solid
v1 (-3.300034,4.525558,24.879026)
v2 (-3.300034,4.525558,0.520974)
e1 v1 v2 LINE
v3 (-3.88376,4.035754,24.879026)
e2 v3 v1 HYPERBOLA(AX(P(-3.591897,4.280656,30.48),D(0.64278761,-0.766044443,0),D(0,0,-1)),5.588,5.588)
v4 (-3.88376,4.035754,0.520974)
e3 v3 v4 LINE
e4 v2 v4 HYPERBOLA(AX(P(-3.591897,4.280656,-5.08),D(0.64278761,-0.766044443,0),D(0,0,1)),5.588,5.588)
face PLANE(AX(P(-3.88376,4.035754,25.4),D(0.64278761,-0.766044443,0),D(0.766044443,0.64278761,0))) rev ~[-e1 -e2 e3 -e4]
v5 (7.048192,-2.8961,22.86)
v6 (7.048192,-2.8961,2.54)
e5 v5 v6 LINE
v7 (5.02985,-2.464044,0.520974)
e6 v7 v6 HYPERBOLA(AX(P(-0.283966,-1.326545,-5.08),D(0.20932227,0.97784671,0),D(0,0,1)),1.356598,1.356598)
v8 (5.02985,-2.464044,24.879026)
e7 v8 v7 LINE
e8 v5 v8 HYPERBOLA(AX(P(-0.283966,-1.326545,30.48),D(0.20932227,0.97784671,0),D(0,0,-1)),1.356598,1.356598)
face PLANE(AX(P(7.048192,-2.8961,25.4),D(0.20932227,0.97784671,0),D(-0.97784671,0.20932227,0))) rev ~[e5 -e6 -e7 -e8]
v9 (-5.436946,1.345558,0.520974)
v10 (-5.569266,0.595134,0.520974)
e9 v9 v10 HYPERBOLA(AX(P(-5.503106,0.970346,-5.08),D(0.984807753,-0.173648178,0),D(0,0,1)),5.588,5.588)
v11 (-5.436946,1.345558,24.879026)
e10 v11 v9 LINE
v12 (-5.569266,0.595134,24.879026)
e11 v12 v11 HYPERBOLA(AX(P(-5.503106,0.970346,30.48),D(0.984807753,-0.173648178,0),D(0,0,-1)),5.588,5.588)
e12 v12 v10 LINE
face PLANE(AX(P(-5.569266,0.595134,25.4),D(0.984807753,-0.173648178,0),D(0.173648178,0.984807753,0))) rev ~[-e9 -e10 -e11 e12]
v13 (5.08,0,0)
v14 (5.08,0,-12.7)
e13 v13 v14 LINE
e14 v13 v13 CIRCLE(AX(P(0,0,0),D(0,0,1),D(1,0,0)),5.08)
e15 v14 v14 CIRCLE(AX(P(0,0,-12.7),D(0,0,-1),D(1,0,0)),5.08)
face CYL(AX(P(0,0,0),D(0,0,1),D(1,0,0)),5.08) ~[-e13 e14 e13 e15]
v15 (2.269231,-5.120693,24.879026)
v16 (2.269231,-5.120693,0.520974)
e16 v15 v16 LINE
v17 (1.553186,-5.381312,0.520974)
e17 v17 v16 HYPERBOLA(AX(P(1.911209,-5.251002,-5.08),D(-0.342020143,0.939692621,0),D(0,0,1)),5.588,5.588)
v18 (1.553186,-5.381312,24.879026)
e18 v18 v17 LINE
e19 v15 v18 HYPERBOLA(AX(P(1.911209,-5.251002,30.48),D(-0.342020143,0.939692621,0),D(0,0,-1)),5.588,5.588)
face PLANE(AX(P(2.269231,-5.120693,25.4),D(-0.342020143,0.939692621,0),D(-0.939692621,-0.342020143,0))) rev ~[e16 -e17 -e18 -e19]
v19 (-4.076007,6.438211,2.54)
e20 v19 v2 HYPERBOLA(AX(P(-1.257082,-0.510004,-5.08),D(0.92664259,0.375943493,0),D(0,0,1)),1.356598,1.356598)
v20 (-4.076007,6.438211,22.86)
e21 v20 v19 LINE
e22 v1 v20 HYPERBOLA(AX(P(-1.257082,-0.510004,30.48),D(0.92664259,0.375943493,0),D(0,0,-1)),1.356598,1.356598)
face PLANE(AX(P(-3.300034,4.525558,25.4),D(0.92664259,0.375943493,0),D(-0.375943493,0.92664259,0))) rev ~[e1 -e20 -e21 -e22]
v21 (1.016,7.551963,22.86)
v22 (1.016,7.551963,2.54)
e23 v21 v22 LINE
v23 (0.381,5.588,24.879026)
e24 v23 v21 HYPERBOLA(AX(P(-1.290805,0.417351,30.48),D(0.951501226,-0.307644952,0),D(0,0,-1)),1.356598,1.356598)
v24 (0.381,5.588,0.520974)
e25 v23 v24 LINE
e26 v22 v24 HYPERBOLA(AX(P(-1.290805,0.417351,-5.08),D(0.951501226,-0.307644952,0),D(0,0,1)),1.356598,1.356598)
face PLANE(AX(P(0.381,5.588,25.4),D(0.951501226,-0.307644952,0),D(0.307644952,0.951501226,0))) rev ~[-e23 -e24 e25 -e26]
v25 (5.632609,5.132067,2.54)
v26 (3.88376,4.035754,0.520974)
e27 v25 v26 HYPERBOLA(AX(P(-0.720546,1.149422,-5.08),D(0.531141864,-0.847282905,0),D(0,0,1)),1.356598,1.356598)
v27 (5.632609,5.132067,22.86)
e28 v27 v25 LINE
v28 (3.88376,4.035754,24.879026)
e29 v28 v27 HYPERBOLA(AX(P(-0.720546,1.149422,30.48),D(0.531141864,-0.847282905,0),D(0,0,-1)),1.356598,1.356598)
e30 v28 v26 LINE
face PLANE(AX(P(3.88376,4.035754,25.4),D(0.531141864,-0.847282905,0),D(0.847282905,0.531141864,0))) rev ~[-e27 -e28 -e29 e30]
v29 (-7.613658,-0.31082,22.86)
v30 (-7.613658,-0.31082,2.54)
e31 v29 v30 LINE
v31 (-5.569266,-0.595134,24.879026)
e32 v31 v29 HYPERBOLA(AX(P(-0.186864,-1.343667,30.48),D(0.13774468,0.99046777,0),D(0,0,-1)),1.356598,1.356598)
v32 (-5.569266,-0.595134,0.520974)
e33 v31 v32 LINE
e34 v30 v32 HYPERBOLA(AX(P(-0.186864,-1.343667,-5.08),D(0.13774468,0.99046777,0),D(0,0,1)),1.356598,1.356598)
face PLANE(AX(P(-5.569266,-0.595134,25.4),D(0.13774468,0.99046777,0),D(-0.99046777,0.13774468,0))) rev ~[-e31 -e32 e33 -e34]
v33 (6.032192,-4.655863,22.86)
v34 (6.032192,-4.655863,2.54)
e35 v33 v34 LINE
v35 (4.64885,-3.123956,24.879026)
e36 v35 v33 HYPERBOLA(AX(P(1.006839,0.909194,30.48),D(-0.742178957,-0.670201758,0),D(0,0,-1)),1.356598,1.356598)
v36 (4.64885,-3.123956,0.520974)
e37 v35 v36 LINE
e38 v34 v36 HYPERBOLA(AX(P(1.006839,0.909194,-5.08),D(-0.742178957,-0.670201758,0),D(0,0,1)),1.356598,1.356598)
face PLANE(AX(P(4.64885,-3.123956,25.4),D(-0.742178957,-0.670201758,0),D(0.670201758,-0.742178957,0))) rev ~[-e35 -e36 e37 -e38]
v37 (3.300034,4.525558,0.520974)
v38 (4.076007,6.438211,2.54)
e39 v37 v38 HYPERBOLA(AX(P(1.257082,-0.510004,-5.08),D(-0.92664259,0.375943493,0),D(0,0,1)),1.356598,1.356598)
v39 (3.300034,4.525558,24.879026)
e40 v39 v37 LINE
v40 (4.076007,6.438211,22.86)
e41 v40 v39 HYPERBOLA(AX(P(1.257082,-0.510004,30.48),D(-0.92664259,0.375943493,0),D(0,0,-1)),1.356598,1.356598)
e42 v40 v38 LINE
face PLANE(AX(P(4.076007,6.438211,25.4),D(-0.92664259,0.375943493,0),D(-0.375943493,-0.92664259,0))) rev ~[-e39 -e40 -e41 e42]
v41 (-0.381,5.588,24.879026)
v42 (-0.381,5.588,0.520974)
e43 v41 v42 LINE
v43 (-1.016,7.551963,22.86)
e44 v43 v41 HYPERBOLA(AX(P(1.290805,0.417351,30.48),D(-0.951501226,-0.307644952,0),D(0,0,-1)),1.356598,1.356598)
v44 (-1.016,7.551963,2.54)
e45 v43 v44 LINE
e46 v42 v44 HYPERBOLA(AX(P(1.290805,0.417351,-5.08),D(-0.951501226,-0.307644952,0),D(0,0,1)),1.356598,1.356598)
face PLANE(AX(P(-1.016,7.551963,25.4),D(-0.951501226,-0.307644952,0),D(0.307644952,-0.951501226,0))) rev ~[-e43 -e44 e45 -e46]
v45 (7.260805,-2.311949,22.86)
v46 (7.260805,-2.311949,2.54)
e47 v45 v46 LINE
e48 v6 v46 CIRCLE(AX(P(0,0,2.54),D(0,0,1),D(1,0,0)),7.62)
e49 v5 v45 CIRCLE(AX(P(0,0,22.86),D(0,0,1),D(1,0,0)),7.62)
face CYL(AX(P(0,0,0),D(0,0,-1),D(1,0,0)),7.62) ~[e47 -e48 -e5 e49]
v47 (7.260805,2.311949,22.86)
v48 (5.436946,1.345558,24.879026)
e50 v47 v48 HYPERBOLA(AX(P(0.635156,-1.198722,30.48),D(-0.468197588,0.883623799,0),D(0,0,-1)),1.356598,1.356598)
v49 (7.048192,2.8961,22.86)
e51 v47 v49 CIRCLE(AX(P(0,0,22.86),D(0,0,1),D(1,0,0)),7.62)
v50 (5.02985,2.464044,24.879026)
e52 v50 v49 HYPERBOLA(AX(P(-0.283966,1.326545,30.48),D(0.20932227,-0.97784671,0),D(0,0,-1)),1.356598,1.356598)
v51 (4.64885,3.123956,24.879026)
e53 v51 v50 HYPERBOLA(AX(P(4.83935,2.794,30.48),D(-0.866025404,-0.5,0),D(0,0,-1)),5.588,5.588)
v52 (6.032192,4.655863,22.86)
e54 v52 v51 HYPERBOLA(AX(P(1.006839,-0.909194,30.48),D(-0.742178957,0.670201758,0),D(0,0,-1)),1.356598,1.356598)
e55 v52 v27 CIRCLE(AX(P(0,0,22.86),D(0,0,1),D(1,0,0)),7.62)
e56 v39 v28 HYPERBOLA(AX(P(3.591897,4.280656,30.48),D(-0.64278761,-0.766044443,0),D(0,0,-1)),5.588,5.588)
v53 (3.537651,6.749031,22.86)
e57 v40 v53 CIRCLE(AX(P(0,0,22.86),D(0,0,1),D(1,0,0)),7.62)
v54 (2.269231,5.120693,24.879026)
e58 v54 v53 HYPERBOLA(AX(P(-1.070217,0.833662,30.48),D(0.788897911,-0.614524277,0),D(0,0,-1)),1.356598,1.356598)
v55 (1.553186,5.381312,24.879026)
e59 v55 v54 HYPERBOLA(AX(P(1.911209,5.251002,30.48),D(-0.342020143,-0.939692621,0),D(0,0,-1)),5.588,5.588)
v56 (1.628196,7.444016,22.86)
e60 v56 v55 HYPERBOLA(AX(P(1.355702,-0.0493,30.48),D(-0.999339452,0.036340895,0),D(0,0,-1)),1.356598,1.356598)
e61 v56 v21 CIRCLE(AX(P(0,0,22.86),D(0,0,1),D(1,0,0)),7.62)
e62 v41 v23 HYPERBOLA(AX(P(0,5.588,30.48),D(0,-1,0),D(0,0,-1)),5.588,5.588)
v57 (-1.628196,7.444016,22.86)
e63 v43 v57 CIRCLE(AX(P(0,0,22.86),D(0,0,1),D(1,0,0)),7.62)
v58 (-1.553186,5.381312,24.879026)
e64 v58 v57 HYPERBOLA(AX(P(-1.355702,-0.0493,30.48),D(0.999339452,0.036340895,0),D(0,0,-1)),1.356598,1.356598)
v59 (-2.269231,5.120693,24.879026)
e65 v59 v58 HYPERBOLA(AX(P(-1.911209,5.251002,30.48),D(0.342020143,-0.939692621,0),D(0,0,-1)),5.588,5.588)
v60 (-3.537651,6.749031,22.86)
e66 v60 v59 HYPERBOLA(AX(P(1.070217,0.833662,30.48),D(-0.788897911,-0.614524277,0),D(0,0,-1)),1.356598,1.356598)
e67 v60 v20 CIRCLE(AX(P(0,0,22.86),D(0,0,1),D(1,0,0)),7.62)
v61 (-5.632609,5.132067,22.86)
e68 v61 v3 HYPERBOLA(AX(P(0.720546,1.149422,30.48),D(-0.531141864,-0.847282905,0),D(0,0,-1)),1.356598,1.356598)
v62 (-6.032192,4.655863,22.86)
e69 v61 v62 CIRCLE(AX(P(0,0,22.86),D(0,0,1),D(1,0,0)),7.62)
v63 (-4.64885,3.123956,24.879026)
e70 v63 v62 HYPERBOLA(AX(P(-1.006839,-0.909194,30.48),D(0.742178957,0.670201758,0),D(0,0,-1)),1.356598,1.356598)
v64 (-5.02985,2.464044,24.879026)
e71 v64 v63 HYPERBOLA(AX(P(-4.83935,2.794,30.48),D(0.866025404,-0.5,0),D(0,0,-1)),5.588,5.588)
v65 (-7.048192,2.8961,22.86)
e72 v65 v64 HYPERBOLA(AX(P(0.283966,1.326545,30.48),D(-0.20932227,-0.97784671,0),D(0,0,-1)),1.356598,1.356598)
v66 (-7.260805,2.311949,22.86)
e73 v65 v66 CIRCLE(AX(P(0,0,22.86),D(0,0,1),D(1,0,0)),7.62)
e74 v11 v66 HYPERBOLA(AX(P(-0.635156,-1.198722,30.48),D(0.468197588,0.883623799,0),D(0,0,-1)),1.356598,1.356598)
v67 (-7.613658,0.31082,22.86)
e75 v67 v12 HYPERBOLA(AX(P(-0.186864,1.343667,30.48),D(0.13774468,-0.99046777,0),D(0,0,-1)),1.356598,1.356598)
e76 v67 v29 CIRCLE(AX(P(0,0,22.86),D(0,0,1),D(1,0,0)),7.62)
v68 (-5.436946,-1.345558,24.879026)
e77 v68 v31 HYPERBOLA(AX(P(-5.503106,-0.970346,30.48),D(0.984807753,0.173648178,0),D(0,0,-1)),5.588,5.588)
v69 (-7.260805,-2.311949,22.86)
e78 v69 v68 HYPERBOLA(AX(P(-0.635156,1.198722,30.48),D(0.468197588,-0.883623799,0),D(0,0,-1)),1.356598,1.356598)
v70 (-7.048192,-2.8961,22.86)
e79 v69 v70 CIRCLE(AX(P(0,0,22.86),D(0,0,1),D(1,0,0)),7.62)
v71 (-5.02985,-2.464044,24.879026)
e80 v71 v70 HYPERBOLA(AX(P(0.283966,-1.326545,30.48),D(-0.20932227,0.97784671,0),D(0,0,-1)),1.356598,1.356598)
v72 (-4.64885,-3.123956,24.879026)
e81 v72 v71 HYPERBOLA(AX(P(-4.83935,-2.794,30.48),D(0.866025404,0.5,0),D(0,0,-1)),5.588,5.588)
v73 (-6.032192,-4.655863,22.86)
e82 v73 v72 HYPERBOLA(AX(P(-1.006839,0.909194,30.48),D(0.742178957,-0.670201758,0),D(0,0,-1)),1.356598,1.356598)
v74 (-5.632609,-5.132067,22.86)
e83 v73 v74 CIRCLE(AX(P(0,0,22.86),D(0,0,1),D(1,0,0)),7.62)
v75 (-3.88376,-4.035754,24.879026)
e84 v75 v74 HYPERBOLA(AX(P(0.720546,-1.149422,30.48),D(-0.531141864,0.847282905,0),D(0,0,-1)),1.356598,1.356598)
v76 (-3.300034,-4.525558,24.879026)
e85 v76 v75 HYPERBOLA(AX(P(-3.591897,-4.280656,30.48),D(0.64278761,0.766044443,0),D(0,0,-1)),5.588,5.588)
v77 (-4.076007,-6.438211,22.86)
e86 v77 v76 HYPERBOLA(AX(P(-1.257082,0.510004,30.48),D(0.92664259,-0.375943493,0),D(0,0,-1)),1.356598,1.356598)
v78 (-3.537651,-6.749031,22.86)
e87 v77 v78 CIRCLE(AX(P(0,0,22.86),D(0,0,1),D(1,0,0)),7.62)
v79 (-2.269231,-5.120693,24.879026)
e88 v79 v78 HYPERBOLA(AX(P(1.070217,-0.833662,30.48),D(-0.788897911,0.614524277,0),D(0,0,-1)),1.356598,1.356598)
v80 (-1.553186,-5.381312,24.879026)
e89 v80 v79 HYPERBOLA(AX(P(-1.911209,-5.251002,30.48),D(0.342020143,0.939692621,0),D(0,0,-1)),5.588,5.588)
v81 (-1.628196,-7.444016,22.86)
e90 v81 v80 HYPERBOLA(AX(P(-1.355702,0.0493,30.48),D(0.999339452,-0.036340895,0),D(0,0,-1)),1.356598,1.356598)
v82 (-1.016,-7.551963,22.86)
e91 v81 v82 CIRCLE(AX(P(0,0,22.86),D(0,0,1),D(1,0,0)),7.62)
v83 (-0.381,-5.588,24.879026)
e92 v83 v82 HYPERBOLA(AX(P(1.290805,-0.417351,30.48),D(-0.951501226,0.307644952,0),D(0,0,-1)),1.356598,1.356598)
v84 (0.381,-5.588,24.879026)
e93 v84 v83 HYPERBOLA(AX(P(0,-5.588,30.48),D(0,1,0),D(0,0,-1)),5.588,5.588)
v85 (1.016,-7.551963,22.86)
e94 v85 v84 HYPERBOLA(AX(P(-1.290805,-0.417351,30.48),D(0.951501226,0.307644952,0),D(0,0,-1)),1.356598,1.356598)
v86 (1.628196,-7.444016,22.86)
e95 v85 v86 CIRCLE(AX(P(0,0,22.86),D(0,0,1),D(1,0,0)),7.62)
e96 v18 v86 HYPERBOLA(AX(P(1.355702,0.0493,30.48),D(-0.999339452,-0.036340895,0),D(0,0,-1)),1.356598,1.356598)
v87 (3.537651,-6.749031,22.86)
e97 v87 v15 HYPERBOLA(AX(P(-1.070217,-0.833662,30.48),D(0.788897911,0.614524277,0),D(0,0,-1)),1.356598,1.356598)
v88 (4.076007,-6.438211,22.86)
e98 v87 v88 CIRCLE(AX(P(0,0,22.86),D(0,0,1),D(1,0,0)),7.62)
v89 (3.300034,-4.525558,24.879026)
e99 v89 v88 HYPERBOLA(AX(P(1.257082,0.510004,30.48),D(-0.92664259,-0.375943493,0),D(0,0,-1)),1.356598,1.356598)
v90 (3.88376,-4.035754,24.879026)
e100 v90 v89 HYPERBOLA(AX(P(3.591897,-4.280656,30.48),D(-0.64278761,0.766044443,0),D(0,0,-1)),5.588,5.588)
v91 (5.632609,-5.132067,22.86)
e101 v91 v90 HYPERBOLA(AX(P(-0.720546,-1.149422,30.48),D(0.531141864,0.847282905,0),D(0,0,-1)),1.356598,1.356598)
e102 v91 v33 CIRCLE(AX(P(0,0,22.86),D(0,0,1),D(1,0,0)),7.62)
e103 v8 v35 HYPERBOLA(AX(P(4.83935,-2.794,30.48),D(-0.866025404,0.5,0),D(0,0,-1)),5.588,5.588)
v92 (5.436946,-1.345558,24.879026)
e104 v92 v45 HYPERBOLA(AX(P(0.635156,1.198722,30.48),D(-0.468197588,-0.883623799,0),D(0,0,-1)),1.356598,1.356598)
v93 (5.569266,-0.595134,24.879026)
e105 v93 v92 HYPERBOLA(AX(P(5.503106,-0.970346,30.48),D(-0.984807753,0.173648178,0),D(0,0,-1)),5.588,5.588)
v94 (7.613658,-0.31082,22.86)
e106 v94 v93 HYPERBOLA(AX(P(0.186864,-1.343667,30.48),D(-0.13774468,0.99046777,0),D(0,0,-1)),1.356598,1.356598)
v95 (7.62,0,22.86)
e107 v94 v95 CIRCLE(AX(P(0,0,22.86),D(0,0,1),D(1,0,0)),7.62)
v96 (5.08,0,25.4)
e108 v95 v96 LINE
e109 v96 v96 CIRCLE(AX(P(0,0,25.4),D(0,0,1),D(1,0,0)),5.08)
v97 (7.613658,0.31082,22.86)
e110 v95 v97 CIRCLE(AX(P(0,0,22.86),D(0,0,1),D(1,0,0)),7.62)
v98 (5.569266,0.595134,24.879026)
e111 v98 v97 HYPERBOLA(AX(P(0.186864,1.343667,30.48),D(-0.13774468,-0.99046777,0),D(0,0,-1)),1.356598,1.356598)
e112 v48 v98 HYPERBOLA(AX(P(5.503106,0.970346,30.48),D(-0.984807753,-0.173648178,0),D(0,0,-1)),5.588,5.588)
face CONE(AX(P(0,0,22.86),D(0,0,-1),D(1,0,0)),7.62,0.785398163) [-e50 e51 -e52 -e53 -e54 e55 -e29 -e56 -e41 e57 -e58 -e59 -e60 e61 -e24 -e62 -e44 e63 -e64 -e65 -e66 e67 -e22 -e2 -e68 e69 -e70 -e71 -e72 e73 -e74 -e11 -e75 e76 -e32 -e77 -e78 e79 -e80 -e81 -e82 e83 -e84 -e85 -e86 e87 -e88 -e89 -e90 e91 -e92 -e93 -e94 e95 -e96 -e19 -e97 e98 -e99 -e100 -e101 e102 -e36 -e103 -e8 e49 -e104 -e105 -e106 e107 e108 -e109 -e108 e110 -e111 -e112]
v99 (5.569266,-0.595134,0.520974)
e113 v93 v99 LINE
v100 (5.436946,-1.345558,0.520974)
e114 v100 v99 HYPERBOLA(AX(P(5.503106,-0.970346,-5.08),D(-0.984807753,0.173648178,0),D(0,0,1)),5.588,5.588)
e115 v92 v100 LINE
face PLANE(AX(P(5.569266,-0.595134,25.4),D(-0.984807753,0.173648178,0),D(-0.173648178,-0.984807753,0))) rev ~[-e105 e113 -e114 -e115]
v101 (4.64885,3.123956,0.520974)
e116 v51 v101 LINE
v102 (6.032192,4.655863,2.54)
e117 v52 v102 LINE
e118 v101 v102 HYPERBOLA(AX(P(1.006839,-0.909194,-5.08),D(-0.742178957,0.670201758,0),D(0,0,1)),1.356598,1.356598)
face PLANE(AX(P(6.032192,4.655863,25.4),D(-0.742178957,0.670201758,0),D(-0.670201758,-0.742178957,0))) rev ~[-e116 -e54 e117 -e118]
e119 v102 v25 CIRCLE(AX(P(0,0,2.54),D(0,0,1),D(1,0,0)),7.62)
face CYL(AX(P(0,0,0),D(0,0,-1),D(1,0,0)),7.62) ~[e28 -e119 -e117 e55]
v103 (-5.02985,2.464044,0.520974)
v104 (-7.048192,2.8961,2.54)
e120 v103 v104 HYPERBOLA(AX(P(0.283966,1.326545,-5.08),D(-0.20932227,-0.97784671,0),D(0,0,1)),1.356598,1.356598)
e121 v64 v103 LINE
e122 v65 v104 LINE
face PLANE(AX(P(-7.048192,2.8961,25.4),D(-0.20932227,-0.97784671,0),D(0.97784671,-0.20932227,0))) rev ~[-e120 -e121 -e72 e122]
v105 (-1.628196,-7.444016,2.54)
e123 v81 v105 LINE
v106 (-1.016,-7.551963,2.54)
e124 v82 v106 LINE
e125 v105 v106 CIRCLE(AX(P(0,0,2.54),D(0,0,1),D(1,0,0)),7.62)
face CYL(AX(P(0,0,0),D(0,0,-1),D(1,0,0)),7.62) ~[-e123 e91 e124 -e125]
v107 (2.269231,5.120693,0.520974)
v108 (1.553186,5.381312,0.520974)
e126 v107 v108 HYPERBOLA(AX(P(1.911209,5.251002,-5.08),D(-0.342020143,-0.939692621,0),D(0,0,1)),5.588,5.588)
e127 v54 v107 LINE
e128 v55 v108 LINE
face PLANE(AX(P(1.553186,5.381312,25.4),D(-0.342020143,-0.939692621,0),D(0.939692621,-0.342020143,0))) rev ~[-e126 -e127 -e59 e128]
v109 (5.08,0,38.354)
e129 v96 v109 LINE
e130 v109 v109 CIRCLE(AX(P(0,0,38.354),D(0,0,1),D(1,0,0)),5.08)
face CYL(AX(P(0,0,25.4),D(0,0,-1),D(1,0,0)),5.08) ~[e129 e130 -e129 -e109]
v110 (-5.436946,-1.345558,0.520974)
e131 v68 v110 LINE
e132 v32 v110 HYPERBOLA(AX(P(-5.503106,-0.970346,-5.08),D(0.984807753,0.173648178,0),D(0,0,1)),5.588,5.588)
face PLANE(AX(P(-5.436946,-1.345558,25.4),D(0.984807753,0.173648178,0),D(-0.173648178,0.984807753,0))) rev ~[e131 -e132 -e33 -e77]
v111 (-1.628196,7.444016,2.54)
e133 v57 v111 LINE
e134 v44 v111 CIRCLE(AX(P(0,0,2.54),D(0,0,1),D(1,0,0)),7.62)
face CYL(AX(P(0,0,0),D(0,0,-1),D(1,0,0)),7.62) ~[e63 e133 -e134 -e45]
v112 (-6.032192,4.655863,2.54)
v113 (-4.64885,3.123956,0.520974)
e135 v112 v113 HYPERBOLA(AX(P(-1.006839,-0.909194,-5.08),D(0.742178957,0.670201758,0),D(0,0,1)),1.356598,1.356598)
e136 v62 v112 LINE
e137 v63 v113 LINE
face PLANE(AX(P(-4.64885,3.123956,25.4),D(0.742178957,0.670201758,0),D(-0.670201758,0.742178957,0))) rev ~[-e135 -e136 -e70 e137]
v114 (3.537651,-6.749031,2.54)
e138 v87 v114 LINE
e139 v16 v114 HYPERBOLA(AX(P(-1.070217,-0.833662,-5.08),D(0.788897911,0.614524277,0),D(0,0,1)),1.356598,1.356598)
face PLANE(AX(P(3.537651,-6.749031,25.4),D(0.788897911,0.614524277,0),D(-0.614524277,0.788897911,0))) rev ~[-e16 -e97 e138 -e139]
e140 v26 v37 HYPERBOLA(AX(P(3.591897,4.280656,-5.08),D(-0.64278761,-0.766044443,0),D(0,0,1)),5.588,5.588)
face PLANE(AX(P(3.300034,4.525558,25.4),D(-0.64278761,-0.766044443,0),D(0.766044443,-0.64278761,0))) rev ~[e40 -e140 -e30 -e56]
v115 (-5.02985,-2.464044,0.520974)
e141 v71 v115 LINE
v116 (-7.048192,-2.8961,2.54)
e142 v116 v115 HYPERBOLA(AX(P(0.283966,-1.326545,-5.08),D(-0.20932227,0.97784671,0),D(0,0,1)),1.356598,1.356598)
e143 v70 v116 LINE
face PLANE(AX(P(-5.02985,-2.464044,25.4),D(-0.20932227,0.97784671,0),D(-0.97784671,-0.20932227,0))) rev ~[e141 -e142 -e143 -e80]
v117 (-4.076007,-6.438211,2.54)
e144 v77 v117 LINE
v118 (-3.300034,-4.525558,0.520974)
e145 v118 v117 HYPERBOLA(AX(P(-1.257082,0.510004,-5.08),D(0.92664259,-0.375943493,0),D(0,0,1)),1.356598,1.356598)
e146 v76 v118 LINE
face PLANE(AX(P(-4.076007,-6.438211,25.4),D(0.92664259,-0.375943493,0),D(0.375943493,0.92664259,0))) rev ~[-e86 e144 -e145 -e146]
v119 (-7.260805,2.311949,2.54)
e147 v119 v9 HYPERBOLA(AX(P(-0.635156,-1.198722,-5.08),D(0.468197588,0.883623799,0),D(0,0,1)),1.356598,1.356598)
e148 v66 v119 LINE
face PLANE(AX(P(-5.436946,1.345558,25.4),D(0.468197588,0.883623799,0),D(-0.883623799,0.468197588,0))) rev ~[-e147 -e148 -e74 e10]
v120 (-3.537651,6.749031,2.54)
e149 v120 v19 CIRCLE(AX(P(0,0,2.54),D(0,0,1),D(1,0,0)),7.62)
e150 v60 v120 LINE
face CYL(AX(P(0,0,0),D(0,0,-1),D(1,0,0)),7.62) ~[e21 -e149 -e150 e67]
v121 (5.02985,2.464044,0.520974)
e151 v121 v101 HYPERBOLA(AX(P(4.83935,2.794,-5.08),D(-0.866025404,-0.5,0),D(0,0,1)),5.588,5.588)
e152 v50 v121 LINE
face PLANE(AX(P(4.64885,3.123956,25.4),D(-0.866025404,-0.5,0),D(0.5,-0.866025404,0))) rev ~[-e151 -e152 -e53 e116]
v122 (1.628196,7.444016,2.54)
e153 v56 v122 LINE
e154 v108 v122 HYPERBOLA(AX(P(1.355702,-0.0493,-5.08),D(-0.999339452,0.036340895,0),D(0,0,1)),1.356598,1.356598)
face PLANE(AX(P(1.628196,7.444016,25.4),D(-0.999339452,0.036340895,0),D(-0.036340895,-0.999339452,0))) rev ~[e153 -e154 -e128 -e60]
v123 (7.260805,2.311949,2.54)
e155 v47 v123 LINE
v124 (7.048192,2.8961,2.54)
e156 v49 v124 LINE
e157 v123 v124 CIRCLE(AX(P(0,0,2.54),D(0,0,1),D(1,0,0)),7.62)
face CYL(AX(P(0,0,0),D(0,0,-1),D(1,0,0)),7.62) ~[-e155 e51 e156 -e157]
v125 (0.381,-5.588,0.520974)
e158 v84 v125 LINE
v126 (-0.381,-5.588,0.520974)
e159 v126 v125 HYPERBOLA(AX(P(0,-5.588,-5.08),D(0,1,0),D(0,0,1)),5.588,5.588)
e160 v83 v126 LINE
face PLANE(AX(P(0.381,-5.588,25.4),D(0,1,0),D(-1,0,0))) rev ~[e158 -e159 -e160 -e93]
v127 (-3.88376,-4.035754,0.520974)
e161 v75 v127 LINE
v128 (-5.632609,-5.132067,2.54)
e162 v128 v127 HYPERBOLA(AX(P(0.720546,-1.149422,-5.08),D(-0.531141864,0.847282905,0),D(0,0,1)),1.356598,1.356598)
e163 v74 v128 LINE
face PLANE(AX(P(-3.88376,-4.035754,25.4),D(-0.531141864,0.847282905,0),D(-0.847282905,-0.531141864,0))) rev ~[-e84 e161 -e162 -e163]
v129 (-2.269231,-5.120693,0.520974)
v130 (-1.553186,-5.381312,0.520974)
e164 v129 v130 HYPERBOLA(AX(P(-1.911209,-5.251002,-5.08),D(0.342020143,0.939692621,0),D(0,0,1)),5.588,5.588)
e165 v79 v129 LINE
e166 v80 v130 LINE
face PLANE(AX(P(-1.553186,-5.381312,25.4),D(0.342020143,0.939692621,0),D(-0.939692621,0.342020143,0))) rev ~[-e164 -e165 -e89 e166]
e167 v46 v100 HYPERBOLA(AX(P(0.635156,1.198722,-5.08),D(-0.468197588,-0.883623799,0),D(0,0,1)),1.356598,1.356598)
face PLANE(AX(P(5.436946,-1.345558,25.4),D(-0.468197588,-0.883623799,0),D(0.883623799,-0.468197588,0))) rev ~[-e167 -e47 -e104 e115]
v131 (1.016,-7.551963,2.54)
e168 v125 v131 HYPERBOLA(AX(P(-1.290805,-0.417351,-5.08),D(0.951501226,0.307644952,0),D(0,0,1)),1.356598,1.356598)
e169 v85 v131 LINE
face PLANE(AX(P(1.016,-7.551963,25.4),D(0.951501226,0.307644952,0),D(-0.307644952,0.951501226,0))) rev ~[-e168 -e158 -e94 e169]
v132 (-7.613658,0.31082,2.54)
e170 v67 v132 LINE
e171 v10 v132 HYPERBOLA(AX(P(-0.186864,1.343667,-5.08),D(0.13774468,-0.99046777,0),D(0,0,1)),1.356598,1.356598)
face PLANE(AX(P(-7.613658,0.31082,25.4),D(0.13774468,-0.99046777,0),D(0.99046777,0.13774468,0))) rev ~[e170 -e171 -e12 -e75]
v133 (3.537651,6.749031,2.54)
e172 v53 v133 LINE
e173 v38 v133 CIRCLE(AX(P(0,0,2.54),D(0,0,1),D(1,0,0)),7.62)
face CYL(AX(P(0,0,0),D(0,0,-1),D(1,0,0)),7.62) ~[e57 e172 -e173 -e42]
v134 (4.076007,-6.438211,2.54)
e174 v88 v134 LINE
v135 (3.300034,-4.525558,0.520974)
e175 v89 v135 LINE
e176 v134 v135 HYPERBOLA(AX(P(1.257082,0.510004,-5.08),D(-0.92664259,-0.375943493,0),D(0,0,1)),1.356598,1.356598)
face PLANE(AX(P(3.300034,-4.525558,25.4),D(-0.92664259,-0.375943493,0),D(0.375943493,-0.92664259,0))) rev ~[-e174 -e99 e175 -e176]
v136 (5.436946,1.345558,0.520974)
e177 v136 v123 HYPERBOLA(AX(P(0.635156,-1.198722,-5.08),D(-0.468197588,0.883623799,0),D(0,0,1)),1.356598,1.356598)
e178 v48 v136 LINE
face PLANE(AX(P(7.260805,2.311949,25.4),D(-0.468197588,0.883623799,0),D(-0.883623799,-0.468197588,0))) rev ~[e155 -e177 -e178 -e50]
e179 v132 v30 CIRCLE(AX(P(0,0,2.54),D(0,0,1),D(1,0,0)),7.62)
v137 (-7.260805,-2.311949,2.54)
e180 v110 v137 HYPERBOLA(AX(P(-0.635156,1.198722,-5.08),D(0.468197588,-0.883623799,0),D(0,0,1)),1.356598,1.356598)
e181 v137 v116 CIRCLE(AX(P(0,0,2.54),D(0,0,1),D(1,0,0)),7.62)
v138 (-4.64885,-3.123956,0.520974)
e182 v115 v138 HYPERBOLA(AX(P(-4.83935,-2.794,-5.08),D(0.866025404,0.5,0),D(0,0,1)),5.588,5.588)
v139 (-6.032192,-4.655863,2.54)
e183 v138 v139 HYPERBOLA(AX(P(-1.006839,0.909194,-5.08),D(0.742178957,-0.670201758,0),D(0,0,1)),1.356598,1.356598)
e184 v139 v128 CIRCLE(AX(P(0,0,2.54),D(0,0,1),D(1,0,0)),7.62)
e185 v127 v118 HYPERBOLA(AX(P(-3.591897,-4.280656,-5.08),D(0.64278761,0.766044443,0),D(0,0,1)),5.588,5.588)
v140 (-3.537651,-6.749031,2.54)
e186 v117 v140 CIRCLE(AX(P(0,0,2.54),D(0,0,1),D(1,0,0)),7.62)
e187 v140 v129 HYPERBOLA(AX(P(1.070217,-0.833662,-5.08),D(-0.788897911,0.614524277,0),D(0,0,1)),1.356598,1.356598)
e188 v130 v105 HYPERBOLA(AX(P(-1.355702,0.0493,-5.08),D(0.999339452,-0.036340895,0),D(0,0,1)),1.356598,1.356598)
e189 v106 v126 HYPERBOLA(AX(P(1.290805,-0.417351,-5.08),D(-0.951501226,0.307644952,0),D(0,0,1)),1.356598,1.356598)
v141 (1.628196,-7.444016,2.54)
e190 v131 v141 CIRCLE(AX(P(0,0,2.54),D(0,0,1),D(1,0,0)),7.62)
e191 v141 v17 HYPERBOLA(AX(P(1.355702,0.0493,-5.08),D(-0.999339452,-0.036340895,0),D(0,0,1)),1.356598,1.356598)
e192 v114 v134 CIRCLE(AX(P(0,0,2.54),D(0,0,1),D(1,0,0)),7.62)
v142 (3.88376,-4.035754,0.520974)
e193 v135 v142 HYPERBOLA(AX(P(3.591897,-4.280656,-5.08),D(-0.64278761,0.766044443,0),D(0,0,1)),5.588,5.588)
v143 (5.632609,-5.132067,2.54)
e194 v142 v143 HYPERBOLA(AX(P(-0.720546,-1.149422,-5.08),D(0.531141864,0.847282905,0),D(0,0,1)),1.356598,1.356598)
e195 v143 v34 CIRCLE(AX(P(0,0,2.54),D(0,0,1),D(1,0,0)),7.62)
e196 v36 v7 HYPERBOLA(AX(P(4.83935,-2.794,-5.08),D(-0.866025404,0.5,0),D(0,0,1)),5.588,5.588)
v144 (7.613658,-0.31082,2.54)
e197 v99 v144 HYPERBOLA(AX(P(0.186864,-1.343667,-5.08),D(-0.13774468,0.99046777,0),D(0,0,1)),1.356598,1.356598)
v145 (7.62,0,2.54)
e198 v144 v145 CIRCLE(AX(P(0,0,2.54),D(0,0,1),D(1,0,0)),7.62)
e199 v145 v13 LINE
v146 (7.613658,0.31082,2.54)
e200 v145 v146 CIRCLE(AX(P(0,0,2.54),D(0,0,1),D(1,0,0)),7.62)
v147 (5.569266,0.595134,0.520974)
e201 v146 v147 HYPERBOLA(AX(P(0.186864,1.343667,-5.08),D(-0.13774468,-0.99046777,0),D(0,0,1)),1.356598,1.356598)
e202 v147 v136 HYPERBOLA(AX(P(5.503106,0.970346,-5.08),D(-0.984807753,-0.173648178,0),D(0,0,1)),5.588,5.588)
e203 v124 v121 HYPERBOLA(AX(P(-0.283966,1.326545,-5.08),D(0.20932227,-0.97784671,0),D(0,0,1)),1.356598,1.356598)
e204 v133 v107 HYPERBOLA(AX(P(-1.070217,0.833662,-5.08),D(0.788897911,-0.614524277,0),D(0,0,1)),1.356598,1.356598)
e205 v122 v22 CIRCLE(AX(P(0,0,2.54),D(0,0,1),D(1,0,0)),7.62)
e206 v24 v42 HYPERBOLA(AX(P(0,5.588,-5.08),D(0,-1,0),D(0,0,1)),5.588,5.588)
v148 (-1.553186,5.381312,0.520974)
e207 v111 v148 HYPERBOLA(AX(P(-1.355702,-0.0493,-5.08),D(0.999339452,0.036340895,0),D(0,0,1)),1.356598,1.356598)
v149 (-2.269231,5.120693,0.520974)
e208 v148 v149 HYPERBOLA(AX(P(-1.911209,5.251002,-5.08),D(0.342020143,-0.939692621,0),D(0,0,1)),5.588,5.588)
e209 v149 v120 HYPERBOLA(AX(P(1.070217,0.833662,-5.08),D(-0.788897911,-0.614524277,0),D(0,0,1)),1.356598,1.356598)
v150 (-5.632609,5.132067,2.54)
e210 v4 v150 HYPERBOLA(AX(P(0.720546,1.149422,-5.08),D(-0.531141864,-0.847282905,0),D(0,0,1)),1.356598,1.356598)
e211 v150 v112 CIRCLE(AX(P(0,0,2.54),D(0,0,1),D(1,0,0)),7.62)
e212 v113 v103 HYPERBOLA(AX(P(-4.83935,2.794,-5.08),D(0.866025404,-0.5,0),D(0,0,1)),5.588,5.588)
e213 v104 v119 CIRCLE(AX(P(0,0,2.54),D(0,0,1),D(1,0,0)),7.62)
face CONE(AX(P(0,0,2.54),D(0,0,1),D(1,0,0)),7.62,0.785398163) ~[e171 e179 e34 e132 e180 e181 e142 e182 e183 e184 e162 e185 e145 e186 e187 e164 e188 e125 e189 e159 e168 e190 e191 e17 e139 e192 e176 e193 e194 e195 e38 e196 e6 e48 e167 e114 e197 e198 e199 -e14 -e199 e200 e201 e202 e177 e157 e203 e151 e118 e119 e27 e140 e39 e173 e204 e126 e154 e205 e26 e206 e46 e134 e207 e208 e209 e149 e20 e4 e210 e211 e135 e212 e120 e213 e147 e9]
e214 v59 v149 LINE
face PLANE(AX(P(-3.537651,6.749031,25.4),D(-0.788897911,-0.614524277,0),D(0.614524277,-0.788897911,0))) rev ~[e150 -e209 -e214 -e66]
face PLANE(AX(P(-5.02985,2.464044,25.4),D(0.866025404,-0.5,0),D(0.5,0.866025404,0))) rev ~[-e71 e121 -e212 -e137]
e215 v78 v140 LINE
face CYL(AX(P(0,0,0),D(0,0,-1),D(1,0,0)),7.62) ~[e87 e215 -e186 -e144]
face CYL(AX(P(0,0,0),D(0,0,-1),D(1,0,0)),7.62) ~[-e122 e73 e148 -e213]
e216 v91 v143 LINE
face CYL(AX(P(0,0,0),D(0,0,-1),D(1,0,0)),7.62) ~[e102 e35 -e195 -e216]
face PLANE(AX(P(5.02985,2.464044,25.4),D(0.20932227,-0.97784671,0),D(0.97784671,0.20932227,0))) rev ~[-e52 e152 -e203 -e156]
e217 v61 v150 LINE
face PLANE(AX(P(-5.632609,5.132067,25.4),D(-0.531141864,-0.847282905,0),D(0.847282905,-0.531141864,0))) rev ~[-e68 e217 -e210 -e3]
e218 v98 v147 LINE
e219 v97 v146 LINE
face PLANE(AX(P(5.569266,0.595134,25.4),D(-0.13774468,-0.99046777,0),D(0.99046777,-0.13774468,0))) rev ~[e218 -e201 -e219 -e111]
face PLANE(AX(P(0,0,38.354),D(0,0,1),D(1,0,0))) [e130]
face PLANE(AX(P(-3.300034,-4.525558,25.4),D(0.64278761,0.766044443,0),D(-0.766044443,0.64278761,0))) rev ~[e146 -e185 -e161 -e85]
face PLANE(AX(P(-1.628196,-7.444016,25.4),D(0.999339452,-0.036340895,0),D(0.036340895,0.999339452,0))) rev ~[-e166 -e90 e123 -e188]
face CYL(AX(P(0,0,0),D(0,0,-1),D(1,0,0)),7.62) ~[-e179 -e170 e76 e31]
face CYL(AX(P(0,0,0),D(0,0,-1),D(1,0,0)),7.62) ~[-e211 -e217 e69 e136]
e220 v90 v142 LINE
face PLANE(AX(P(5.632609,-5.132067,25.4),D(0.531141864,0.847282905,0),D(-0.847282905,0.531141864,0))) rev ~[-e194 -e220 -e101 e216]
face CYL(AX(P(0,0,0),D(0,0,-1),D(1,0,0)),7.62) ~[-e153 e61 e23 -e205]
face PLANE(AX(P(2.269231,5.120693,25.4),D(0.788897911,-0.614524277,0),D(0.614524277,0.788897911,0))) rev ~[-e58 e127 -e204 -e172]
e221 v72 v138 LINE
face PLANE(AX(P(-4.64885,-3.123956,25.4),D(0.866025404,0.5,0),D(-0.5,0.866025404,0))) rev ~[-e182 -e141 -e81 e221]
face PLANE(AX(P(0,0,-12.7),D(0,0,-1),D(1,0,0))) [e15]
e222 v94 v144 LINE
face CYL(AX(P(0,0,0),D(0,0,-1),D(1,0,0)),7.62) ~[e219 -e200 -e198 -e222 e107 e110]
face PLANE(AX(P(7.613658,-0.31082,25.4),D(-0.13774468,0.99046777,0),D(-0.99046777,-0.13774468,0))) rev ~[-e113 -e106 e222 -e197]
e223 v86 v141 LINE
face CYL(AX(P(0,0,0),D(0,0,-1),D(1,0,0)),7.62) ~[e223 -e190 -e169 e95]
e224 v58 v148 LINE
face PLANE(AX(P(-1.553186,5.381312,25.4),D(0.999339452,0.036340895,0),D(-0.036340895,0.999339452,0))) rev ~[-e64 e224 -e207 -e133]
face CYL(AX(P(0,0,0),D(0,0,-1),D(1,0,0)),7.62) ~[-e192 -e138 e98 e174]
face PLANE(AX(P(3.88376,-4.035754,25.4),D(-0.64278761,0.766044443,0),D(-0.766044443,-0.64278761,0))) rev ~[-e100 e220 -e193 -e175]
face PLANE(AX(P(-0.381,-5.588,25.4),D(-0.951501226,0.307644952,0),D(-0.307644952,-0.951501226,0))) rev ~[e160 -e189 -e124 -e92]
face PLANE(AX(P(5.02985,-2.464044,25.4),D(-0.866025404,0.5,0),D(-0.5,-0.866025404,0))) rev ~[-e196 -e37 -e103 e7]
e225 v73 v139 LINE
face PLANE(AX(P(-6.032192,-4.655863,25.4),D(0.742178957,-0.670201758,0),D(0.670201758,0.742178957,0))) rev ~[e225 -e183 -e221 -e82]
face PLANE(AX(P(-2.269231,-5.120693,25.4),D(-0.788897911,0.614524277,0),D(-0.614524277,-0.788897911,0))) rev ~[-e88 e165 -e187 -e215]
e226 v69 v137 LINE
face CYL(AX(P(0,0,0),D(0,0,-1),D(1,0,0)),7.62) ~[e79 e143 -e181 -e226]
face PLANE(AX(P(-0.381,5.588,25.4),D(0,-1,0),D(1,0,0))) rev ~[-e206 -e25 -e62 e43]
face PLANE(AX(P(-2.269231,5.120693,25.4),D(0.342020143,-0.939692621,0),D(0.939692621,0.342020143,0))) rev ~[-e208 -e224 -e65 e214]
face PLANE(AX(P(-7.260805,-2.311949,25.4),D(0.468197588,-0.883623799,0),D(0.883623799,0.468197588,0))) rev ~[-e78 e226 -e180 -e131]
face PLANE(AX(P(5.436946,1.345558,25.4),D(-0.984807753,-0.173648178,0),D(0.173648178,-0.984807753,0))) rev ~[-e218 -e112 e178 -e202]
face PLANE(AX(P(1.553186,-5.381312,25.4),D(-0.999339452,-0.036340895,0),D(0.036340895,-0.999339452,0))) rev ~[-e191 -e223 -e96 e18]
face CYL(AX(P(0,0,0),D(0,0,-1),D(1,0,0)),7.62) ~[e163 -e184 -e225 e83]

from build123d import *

# Parameters (mm, degrees)
F0_R            = 7.62
F1_DEPTH        = 25.4
F2_SIZE         = 2.54
F4_DEPTH        = 25.4
F4_COPIES_COUNT = 18
F6_R            = 5.08
F7_DEPTH        = 12.954
F8_R            = 5.08
F9_DEPTH        = 12.7


# Not quite as in the source:
# - a pattern or mirror of a feature is missing from the dataset's text; its kind, count and spacing are read off the source's solid


with BuildPart() as f1:
    # F0 (on Top) → F1 (new body)
    with BuildSketch(Plane.XY):
        Circle(F0_R)
    extrude(amount=F1_DEPTH)

    # F2
    f2_edges = [f1.edges().sort_by_distance(p)[0] for p in [
        (-7.62, 0, 25.4),
        (-7.62, 0, 0),
    ]]
    chamfer(f2_edges, length=F2_SIZE)

    # F3 (on face) → F4 (cut, through all)
    with BuildSketch(Plane.XY.offset(25.4)):
        with BuildLine():
            ThreePointArc((1.016, 7.5519629236), (0, 7.62), (-1.016, 7.5519629236))
            Line((-1.016, 7.5519629236), (-0.381, 5.588))
            Line((-0.381, 5.588), (0.381, 5.588))
            Line((0.381, 5.588), (1.016, 7.5519629236))
        make_face()
    f4 = extrude(amount=-F4_DEPTH, mode=Mode.SUBTRACT)

    # F4_copies: F4 ×18 about axis
    f4_copies_axis = Axis((0, 0, 0), (0, 0, 1))
    for i in range(1, F4_COPIES_COUNT):
        add(f4.rotate(f4_copies_axis, i * 360 / F4_COPIES_COUNT), mode=Mode.SUBTRACT)

    # F6 (on face) → F7 (join)
    with BuildSketch(Plane.XY.offset(25.4)):
        Circle(F6_R)
    extrude(amount=F7_DEPTH)

    # F8 (on face) → F9 (join)
    with BuildSketch(Plane(origin=(0, 0, 0), x_dir=(1, 0, 0), z_dir=(0, 0, -1))):
        Circle(F8_R)
    extrude(amount=F9_DEPTH)


solid = f1.part
